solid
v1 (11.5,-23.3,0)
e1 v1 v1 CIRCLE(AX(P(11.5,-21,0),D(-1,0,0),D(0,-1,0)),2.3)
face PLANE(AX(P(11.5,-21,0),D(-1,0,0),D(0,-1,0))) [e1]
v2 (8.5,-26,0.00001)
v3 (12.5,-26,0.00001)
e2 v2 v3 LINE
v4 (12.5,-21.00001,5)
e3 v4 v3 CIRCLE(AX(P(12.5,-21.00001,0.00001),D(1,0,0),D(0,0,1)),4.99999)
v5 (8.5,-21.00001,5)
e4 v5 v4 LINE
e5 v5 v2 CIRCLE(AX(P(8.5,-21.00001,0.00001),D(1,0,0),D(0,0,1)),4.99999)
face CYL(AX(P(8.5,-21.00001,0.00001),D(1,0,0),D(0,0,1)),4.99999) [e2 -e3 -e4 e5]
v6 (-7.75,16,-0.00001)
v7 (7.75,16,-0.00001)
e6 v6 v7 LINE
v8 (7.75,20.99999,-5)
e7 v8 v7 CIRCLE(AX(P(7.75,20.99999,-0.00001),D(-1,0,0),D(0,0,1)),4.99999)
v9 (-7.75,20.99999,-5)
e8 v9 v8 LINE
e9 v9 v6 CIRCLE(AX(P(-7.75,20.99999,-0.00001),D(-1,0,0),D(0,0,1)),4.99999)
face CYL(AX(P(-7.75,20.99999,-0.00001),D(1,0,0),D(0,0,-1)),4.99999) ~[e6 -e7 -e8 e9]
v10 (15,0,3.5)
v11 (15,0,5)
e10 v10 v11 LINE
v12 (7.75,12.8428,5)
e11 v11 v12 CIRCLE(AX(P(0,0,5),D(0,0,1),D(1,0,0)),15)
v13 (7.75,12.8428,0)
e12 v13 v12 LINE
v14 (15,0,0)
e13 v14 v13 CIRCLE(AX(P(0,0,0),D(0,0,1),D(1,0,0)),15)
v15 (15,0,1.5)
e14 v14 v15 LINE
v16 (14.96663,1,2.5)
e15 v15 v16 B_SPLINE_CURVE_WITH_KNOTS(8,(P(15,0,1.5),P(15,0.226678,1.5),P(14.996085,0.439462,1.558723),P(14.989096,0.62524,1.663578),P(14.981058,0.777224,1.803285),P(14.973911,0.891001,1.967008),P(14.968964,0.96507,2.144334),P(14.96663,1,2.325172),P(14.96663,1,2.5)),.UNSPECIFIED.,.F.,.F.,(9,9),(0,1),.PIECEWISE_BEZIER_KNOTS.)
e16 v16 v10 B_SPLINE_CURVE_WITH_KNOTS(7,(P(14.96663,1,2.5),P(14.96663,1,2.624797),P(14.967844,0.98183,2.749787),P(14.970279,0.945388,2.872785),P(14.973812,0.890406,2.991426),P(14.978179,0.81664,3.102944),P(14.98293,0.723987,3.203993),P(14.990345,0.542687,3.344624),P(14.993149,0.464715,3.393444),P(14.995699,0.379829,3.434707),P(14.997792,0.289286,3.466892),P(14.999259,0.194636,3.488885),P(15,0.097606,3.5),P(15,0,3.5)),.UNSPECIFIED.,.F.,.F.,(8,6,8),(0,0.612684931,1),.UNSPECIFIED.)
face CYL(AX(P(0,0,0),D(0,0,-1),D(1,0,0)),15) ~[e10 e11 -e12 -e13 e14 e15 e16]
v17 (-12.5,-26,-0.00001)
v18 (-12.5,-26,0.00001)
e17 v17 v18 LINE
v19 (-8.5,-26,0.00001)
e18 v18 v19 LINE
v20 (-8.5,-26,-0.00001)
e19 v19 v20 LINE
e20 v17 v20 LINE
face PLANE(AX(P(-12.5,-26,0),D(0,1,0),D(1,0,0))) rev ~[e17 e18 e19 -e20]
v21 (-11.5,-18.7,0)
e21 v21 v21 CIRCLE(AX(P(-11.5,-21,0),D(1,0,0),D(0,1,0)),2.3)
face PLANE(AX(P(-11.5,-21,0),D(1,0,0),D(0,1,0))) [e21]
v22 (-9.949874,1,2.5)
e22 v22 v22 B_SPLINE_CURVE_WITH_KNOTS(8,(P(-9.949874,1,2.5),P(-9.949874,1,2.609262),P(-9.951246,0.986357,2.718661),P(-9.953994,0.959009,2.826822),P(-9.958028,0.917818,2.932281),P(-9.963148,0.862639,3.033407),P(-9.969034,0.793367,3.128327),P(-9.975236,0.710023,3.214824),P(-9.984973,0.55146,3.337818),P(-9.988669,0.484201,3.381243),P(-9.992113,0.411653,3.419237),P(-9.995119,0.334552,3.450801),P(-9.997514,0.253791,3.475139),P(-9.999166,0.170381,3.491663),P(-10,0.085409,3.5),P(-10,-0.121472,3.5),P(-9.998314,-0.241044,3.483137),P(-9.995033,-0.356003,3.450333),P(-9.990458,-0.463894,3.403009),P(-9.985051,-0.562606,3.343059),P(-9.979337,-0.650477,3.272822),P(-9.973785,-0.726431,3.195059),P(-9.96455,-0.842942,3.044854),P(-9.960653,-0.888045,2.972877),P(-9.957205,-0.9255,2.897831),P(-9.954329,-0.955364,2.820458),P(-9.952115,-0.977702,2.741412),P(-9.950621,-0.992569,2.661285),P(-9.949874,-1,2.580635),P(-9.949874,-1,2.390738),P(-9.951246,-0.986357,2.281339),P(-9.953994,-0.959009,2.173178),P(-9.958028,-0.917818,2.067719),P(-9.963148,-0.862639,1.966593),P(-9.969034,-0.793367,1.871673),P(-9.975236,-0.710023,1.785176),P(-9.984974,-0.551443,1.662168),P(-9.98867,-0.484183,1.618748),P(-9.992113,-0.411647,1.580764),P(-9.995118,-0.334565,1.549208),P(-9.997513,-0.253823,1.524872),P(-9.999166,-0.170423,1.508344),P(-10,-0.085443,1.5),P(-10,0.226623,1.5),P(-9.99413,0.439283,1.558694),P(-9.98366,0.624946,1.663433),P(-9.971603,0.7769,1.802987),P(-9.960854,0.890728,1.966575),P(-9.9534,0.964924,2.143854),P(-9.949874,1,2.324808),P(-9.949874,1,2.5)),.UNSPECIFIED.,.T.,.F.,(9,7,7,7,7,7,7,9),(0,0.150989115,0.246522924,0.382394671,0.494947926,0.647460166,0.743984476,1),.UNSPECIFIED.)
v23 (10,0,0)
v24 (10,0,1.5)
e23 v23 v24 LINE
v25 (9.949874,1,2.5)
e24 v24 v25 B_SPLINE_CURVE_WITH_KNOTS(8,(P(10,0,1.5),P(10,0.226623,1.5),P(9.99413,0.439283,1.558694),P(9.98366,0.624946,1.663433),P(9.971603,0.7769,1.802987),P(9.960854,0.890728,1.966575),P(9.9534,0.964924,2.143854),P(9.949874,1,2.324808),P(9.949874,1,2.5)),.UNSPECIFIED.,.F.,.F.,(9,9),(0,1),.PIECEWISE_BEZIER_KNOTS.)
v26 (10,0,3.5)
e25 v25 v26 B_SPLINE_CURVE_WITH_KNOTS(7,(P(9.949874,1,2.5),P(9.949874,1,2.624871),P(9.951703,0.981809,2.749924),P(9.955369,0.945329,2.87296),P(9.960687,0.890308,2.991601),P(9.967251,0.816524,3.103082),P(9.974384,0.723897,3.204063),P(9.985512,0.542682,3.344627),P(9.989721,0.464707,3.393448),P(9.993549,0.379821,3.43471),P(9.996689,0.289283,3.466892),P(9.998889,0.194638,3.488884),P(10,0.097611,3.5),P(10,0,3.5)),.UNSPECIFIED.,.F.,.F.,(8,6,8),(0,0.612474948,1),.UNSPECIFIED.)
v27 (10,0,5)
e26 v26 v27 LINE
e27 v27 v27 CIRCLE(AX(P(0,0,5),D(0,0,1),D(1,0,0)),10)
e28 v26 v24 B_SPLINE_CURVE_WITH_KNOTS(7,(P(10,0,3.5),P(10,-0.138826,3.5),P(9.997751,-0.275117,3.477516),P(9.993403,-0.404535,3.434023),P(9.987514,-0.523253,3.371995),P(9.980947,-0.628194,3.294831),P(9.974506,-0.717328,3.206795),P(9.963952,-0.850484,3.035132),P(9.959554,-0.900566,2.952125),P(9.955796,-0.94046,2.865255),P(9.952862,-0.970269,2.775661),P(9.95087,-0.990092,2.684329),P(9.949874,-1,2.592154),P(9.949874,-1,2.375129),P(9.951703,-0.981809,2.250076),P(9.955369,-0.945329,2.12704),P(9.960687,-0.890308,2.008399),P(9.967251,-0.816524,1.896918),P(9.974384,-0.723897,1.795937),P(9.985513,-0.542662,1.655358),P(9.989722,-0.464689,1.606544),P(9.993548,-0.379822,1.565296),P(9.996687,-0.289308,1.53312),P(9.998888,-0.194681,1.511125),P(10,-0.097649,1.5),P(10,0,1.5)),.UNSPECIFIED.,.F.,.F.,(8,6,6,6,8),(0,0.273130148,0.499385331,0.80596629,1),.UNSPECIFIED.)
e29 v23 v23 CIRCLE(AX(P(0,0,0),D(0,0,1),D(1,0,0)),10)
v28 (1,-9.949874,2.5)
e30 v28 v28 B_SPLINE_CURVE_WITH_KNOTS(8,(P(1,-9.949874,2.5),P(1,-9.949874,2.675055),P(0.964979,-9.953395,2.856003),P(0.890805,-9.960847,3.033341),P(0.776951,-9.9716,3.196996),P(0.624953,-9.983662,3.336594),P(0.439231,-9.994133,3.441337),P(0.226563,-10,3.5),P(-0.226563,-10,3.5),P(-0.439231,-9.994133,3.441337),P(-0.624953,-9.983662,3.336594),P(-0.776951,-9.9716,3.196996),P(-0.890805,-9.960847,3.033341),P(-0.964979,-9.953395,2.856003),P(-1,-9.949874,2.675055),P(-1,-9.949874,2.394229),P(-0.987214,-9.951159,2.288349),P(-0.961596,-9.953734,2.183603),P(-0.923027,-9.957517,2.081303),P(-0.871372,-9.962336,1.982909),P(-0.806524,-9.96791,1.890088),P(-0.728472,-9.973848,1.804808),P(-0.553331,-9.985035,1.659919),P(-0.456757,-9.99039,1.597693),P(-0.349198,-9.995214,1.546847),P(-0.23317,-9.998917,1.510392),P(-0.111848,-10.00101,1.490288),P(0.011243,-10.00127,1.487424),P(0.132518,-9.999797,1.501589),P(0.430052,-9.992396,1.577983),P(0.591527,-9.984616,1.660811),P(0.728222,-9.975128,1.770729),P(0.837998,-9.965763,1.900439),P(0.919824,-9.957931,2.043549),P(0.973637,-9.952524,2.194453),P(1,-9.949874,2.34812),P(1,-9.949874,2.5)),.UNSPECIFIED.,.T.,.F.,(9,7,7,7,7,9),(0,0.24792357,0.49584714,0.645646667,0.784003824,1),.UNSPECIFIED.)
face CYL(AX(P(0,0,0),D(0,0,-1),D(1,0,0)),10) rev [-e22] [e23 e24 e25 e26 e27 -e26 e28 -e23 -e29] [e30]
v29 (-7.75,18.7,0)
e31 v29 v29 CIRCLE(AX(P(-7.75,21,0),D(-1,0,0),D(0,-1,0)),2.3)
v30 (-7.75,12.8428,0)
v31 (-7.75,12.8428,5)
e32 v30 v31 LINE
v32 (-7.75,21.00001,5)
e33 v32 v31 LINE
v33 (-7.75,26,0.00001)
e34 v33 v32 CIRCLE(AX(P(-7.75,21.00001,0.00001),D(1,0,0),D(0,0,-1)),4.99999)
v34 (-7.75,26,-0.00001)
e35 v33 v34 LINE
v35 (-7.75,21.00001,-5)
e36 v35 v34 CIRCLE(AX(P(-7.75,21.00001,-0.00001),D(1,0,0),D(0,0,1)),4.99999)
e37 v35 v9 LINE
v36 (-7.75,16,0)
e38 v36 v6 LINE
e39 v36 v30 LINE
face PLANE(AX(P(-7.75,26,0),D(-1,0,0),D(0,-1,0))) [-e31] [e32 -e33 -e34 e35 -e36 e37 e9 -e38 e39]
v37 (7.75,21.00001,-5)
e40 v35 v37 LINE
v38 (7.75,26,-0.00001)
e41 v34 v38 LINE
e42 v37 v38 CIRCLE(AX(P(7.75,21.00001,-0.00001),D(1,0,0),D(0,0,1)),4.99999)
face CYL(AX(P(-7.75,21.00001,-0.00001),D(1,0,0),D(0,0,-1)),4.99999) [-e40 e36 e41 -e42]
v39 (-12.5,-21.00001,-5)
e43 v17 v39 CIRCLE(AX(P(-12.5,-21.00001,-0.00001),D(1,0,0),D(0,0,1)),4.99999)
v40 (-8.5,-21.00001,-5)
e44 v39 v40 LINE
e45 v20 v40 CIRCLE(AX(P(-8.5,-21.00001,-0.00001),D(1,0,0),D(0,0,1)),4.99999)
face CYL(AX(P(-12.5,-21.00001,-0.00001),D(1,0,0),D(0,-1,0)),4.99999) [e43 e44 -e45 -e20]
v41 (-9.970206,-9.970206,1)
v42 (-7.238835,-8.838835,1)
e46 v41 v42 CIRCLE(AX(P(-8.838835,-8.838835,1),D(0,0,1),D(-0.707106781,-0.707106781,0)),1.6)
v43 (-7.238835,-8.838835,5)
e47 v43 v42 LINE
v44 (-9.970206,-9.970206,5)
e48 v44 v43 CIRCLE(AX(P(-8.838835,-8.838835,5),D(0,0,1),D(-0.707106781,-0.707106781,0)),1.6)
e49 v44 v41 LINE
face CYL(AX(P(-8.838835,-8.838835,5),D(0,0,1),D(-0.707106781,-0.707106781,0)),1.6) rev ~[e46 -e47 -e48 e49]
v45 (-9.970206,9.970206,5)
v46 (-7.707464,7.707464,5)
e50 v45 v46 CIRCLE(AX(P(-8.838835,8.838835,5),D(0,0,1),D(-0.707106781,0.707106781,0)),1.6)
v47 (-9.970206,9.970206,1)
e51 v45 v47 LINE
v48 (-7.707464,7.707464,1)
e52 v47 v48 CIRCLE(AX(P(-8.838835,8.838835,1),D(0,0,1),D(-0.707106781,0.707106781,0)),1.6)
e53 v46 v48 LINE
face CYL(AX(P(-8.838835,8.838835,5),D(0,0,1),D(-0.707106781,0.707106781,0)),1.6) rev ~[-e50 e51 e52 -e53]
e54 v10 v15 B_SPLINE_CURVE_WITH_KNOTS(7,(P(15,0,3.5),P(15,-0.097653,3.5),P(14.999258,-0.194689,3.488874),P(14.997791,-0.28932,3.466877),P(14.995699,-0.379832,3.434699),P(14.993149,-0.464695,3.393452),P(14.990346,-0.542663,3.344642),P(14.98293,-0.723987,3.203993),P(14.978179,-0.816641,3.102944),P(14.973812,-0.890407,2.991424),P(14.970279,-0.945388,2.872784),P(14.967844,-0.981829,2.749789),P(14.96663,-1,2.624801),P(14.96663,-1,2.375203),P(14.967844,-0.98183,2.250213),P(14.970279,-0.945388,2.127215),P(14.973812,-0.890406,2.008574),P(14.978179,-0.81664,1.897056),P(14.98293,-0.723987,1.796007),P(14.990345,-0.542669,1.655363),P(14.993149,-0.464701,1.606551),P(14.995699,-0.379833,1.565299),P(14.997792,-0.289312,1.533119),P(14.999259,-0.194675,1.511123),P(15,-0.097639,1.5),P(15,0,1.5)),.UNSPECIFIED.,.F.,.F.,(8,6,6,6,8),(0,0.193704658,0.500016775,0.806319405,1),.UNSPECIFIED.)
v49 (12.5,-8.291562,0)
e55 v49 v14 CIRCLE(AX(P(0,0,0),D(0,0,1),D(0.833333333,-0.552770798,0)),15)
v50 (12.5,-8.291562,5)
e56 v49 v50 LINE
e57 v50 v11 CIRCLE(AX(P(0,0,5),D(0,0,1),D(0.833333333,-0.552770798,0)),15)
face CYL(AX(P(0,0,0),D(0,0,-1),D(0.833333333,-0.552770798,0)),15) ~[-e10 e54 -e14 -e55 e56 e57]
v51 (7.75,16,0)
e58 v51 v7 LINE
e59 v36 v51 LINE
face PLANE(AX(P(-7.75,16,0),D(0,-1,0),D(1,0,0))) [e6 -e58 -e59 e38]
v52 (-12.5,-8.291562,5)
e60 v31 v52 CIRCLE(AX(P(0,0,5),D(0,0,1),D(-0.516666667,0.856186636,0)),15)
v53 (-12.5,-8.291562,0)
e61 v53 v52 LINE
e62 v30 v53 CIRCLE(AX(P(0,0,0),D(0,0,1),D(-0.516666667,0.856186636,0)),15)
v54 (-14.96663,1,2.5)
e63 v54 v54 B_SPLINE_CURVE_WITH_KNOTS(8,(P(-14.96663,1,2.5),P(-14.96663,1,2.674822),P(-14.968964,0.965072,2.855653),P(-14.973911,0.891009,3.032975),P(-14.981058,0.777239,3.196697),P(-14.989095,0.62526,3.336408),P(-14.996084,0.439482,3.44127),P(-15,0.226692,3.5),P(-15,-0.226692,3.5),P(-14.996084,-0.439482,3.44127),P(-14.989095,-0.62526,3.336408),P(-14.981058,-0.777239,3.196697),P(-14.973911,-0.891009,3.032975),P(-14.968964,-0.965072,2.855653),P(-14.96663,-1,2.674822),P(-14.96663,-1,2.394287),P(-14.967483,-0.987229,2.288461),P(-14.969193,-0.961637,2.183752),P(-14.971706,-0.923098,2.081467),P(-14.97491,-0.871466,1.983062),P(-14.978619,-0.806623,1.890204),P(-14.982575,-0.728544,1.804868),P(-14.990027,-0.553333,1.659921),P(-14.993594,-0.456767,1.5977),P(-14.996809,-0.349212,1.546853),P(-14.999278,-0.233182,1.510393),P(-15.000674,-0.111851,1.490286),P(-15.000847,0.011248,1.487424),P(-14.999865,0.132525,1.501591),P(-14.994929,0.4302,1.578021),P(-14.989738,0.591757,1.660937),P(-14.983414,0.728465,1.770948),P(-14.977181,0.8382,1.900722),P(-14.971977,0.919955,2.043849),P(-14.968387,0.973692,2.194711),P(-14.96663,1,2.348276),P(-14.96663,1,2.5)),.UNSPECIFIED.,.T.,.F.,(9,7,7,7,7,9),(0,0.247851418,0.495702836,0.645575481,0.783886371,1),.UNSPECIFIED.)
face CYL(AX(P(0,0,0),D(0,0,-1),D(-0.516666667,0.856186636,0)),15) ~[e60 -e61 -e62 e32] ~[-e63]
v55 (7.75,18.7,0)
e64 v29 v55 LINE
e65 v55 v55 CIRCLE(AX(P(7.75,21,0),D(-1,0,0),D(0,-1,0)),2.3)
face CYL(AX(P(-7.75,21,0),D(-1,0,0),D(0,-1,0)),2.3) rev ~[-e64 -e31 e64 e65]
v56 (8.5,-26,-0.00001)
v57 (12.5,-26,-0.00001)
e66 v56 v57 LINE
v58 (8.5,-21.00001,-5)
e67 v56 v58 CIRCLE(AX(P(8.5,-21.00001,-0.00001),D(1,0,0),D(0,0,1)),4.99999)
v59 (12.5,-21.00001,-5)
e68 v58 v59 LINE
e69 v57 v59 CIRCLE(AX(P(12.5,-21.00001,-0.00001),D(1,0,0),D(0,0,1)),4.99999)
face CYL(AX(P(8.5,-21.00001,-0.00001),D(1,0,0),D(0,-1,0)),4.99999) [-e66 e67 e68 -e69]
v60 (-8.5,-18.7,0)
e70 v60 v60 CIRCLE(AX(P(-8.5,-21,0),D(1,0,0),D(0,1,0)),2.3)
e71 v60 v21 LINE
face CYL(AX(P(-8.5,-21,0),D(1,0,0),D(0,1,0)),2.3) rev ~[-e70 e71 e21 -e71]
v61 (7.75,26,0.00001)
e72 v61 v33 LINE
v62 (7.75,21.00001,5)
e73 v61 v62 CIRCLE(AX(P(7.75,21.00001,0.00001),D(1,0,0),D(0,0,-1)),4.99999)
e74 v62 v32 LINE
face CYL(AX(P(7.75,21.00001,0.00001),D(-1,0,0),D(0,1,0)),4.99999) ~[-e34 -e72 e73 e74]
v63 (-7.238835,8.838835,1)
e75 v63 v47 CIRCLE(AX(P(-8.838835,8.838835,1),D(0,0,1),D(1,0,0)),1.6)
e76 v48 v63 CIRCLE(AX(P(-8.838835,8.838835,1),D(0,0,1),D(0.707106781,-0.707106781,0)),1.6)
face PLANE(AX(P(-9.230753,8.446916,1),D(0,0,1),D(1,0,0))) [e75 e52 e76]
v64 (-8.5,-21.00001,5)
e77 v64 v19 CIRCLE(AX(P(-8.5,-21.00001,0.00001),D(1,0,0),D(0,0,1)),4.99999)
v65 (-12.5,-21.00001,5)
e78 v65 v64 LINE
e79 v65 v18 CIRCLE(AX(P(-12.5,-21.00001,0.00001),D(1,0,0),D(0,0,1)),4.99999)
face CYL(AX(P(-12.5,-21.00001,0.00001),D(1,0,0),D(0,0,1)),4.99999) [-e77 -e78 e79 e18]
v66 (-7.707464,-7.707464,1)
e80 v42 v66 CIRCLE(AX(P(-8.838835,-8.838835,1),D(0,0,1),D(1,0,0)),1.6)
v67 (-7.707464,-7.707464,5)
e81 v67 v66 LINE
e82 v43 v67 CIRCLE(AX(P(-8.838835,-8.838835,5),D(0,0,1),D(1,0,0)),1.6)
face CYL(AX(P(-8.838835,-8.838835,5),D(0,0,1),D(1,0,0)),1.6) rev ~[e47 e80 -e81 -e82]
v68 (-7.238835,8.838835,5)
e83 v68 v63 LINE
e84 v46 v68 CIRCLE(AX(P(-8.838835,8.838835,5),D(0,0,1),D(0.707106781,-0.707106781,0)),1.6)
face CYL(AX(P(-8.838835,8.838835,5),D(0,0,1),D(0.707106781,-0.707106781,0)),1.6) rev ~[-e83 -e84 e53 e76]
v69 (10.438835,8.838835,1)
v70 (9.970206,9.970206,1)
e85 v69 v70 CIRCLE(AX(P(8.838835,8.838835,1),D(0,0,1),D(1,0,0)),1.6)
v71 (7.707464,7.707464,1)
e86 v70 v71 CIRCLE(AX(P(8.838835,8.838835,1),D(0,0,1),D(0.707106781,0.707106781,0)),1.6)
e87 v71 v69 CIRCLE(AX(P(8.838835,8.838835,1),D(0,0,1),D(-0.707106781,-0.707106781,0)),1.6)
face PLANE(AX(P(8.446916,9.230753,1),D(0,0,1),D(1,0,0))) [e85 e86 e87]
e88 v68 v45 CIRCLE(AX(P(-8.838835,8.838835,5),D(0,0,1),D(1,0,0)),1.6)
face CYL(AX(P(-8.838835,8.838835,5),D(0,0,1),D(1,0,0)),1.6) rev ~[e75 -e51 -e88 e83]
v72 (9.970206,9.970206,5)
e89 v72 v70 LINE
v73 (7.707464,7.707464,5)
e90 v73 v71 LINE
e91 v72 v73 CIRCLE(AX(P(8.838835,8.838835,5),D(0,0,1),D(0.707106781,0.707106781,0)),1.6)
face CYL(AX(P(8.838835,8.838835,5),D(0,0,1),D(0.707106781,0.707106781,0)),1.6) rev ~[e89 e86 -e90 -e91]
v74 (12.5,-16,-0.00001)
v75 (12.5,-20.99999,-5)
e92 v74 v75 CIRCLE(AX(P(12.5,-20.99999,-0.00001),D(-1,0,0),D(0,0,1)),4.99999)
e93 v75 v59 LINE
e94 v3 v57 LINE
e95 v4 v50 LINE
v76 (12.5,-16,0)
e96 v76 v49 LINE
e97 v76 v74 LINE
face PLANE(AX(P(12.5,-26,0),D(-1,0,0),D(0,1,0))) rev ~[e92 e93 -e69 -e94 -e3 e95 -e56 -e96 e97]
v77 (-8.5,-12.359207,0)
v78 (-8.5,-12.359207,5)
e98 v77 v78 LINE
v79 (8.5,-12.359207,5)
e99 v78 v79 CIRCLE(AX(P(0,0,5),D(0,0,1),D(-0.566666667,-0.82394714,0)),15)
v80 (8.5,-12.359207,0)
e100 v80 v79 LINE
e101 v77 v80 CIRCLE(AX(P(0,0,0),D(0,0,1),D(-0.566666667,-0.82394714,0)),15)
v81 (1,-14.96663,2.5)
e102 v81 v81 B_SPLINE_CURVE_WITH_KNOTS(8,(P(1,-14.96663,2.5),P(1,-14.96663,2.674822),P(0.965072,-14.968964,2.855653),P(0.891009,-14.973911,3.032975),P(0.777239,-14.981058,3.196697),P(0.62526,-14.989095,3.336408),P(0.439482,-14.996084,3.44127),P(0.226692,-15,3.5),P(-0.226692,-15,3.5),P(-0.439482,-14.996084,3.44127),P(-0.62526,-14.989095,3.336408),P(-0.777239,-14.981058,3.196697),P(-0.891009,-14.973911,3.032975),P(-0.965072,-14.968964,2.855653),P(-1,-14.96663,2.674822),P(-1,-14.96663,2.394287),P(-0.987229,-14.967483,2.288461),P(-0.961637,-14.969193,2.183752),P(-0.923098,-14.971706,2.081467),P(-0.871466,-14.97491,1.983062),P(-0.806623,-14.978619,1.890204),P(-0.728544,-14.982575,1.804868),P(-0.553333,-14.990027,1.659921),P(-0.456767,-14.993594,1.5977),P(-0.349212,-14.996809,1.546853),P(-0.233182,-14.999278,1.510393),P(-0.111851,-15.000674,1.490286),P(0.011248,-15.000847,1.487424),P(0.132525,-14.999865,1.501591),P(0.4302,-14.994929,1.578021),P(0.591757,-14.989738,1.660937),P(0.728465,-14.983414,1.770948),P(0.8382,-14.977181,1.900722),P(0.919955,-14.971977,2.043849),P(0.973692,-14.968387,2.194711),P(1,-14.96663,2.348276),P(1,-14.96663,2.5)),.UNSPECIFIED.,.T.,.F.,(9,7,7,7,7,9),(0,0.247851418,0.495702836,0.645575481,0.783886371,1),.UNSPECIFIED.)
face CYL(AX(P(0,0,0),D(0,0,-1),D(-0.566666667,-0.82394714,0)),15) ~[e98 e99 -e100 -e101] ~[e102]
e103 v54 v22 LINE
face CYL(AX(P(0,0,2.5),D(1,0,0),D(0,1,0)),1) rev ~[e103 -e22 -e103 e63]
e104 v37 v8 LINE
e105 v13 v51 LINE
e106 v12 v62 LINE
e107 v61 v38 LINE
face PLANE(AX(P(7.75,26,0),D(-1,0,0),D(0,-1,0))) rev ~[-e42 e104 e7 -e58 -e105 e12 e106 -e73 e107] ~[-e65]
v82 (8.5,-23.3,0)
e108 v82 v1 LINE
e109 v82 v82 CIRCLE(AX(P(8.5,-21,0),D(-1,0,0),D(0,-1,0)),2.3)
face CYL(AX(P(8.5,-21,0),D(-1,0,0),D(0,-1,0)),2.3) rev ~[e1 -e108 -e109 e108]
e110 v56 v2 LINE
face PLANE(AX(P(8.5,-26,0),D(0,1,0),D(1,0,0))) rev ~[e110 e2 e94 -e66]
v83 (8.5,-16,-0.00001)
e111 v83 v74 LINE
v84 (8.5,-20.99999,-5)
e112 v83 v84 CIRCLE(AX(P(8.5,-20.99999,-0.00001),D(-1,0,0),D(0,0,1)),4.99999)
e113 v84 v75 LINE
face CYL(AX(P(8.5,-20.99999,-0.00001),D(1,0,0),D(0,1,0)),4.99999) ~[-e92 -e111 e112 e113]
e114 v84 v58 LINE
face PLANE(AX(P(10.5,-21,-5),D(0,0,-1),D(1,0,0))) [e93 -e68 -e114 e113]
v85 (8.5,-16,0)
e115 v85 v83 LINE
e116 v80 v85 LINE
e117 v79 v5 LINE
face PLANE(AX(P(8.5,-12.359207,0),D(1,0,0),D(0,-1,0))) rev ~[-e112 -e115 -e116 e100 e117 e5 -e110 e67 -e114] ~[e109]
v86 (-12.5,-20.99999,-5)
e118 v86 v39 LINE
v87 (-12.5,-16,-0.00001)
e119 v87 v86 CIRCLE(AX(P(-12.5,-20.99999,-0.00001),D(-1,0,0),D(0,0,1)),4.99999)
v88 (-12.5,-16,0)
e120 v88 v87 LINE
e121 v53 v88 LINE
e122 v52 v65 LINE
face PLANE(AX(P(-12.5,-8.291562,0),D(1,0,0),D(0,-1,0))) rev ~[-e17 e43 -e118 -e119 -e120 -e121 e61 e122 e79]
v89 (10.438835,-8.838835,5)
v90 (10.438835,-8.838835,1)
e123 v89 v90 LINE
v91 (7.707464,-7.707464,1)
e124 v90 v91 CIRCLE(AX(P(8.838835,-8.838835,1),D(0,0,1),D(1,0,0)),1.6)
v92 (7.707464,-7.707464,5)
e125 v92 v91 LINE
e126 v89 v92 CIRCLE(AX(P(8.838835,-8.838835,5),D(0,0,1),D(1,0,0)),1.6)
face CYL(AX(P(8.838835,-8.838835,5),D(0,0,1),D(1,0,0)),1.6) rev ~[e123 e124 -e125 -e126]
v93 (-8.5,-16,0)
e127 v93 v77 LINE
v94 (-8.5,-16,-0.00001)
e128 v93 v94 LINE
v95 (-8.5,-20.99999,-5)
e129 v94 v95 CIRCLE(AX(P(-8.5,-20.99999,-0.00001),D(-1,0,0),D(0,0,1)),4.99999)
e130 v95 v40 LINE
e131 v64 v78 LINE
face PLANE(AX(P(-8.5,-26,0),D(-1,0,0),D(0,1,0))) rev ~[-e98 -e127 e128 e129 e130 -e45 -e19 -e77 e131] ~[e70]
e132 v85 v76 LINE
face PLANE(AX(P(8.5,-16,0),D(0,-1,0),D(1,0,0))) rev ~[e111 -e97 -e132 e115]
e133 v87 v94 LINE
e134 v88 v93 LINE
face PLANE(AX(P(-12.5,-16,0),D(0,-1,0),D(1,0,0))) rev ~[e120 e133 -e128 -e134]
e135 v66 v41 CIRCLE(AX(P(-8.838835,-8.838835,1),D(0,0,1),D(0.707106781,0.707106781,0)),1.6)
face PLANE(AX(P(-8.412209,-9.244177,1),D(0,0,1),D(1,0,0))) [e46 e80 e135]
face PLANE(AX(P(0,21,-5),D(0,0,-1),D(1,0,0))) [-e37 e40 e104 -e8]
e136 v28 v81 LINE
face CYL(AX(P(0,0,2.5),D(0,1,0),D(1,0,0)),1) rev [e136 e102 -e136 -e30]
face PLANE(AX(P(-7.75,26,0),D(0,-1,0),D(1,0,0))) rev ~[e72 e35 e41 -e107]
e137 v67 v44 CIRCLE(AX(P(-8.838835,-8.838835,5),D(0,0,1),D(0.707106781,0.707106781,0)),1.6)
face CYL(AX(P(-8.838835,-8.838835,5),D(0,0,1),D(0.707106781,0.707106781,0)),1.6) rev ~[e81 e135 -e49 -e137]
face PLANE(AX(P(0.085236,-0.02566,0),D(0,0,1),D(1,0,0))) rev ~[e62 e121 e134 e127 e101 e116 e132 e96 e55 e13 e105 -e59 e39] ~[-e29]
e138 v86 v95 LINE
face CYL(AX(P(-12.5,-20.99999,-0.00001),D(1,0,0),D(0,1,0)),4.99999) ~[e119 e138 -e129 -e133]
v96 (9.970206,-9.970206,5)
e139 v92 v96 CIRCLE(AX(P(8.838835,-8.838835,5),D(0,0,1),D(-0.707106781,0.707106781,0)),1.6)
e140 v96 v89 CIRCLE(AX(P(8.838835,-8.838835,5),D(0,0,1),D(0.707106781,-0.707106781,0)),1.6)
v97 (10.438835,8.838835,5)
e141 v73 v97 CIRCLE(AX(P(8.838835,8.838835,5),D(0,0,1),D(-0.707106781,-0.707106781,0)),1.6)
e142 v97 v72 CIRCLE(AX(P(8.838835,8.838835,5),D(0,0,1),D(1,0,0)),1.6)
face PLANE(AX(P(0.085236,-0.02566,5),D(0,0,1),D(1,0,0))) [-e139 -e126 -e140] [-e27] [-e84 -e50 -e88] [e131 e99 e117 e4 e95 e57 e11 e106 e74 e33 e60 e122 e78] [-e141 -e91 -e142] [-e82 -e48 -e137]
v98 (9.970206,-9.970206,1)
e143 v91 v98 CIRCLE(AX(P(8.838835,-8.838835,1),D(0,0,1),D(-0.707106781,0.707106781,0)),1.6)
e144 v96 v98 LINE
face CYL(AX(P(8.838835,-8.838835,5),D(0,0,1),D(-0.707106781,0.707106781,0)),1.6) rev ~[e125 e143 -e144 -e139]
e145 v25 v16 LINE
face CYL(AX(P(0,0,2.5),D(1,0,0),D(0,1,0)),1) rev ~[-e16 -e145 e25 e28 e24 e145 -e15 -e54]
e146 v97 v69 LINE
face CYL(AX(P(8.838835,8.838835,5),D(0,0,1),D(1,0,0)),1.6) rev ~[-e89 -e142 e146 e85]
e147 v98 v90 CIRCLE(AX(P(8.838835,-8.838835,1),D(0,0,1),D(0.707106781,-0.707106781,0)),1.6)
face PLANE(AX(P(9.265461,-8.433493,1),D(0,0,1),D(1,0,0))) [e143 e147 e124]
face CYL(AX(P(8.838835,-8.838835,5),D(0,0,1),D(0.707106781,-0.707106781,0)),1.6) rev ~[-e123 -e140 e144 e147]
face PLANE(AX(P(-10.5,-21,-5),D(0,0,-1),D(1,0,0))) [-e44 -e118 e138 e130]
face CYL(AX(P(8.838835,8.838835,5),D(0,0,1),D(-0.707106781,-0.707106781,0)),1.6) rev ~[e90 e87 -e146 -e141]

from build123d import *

# Parameters (mm, degrees)
F0_R      = 10
F1_DEPTH  = 5
F2_W      = 15.5
F2_H      = 10
F2_W_2    = 4
F3_DEPTH  = 5
F4_R      = 2.3
F5_DEPTH  = 22.751
F7_DEPTH  = 4
F8_R      = 2.3
F9_DEPTH  = 3
F10_R     = 2.3
F11_DEPTH = 3
F12_R     = 4.99999
F13_R     = 1
F14_DEPTH = 25
F15_R     = 1
F16_DEPTH = 25


# Not quite as in the source:
# - a fillet or chamfer is up to 0.001 mm smaller than in the source, because OpenCascade refuses the exact size


with BuildPart() as f1:
    # F0 (on Top) → F1 (new body)
    with BuildSketch(Plane.XY):
        with BuildLine():
            ThreePointArc((7.75, 12.842799539), (0, 15), (-7.75, 12.842799539))
            ThreePointArc((-7.75, 12.842799539), (-14.634921734, 3.289234841), (-12.5, -8.2915619759))
            ThreePointArc((-12.5, -8.2915619759), (-10.6951593818, -10.5172984077), (-8.5, -12.3592070943))
            ThreePointArc((-8.5, -12.3592070943), (0, -15), (8.5, -12.3592070943))
            ThreePointArc((8.5, -12.3592070943), (10.6951593818, -10.5172984077), (12.5, -8.2915619759))
            ThreePointArc((12.5, -8.2915619759), (14.3614066163, -4.3301270189), (15, 0))
            ThreePointArc((15, 0), (13.0623504776, 7.3739406019), (7.75, 12.842799539))
        make_face()
        Circle(F0_R, mode=Mode.SUBTRACT)
        with BuildLine():
            Line((-7.75, 26), (-7.75, 12.842799539))
            ThreePointArc((-7.75, 12.842799539), (0, 15), (7.75, 12.842799539))
            Line((7.75, 12.842799539), (7.75, 26))
            Line((7.75, 26), (-7.75, 26))
        make_face()
        with BuildLine():
            ThreePointArc((-8.5, -12.3592070943), (-10.6951593818, -10.5172984077), (-12.5, -8.2915619759))
            Line((-12.5, -8.2915619759), (-12.5, -26))
            Line((-12.5, -26), (-8.5, -26))
            Line((-8.5, -26), (-8.5, -12.3592070943))
        make_face()
        with BuildLine():
            ThreePointArc((12.5, -8.2915619759), (10.6951593818, -10.5172984077), (8.5, -12.3592070943))
            Line((8.5, -12.3592070943), (8.5, -26))
            Line((8.5, -26), (12.5, -26))
            Line((12.5, -26), (12.5, -8.2915619759))
        make_face()
    extrude(amount=F1_DEPTH)

    # F2 (on face) → F3 (join)
    with BuildSketch(Plane(origin=(0, 0, 0), x_dir=(1, 0, 0), z_dir=(0, 0, -1))):
        with Locations((0, -21)):
            Rectangle(F2_W, F2_H)
        with Locations((-10.5, 21)):
            Rectangle(F2_W_2, F2_H)
        with Locations((10.5, 21)):
            Rectangle(F2_W_2, F2_H)
    extrude(amount=F3_DEPTH)

    # F4 (on face) → F5 (cut, through all)
    with BuildSketch(Plane(origin=(-7.75, 0, 0), x_dir=(0, -1, 0), z_dir=(-1, 0, 0))):
        with Locations((-21, 0)):
            Circle(F4_R)
    extrude(amount=-F5_DEPTH, mode=Mode.SUBTRACT)

    # F6 (on face) → F7 (cut)
    with BuildSketch(Plane.XY.offset(5)):
        with BuildLine():
            ThreePointArc((10.4388347648, -8.8388347648), (9.4511282566, -7.3606275128), (7.7074639149, -7.7074639149))
            Line((7.7074639149, -7.7074639149), (9.9702056147, -9.9702056147))
            ThreePointArc((9.9702056147, -9.9702056147), (10.3170420168, -9.4511282566), (10.4388347648, -8.8388347648))
        make_face()
        with BuildLine():
            Line((9.9702056147, -9.9702056147), (7.7074639149, -7.7074639149))
            ThreePointArc((7.7074639149, -7.7074639149), (7.7074639149, -9.9702056147), (9.9702056147, -9.9702056147))
        make_face()
        with BuildLine():
            ThreePointArc((9.9702056147, 9.9702056147), (7.7074639149, 9.9702056147), (7.7074639149, 7.7074639149))
            Line((7.7074639149, 7.7074639149), (9.9702056147, 9.9702056147))
        make_face()
        with BuildLine():
            Line((9.9702056147, 9.9702056147), (7.7074639149, 7.7074639149))
            ThreePointArc((7.7074639149, 7.7074639149), (9.4511282566, 7.3606275128), (10.4388347648, 8.8388347648))
            ThreePointArc((10.4388347648, 8.8388347648), (10.3170420168, 9.4511282566), (9.9702056147, 9.9702056147))
        make_face()
        with BuildLine():
            ThreePointArc((-9.9702056147, 9.9702056147), (-9.9702056147, 7.7074639149), (-7.7074639149, 7.7074639149))
            Line((-7.7074639149, 7.7074639149), (-9.9702056147, 9.9702056147))
        make_face()
        with BuildLine():
            Line((-9.9702056147, 9.9702056147), (-7.7074639149, 7.7074639149))
            ThreePointArc((-7.7074639149, 7.7074639149), (-7.3606275128, 8.226541273), (-7.2388347648, 8.8388347648))
            ThreePointArc((-7.2388347648, 8.8388347648), (-8.226541273, 10.3170420168), (-9.9702056147, 9.9702056147))
        make_face()
        with BuildLine():
            ThreePointArc((-7.2388347648, -8.8388347648), (-7.3606275128, -8.226541273), (-7.7074639149, -7.7074639149))
            Line((-7.7074639149, -7.7074639149), (-9.9702056147, -9.9702056147))
            ThreePointArc((-9.9702056147, -9.9702056147), (-8.226541273, -10.3170420168), (-7.2388347648, -8.8388347648))
        make_face()
        with BuildLine():
            Line((-9.9702056147, -9.9702056147), (-7.7074639149, -7.7074639149))
            ThreePointArc((-7.7074639149, -7.7074639149), (-9.9702056147, -7.7074639149), (-9.9702056147, -9.9702056147))
        make_face()
    extrude(amount=-F7_DEPTH, mode=Mode.SUBTRACT)

    # F8 (on face) → F9 (cut)
    with BuildSketch(Plane.YZ.offset(-8.5)):
        with Locations((-21, 0)):
            Circle(F8_R)
    extrude(amount=-F9_DEPTH, mode=Mode.SUBTRACT)

    # F10 (on face) → F11 (cut)
    with BuildSketch(Plane(origin=(8.5, 0, 0), x_dir=(0, -1, 0), z_dir=(-1, 0, 0))):
        with Locations((21, 0)):
            Circle(F10_R)
    extrude(amount=-F11_DEPTH, mode=Mode.SUBTRACT)

    # F12 (radius 5 in the source; OpenCascade refuses exactly that, so slightly less here)
    f12_edges = [f1.edges().sort_by_distance(p)[0] for p in [
        (0, 26, -5),
        (0, 16, -5),
        (0, 26, 5),
        (-10.5, -26, -5),
        (-10.5, -26, 5),
        (10.5, -26, 5),
        (10.5, -26, -5),
        (-10.5, -16, -5),
        (10.5, -16, -5),
    ]]
    fillet(f12_edges, radius=F12_R)

    # F13 (on Right) → F14 (cut, symmetric)
    with BuildSketch(Plane.YZ):
        with Locations((0, 2.5)):
            Circle(F13_R)
    extrude(amount=F14_DEPTH, both=True, mode=Mode.SUBTRACT)

    # F15 (on Front) → F16 (cut)
    with BuildSketch(Plane.XZ):
        with Locations((0, 2.5)):
            Circle(F15_R)
    extrude(amount=F16_DEPTH, mode=Mode.SUBTRACT)


solid = f1.part
